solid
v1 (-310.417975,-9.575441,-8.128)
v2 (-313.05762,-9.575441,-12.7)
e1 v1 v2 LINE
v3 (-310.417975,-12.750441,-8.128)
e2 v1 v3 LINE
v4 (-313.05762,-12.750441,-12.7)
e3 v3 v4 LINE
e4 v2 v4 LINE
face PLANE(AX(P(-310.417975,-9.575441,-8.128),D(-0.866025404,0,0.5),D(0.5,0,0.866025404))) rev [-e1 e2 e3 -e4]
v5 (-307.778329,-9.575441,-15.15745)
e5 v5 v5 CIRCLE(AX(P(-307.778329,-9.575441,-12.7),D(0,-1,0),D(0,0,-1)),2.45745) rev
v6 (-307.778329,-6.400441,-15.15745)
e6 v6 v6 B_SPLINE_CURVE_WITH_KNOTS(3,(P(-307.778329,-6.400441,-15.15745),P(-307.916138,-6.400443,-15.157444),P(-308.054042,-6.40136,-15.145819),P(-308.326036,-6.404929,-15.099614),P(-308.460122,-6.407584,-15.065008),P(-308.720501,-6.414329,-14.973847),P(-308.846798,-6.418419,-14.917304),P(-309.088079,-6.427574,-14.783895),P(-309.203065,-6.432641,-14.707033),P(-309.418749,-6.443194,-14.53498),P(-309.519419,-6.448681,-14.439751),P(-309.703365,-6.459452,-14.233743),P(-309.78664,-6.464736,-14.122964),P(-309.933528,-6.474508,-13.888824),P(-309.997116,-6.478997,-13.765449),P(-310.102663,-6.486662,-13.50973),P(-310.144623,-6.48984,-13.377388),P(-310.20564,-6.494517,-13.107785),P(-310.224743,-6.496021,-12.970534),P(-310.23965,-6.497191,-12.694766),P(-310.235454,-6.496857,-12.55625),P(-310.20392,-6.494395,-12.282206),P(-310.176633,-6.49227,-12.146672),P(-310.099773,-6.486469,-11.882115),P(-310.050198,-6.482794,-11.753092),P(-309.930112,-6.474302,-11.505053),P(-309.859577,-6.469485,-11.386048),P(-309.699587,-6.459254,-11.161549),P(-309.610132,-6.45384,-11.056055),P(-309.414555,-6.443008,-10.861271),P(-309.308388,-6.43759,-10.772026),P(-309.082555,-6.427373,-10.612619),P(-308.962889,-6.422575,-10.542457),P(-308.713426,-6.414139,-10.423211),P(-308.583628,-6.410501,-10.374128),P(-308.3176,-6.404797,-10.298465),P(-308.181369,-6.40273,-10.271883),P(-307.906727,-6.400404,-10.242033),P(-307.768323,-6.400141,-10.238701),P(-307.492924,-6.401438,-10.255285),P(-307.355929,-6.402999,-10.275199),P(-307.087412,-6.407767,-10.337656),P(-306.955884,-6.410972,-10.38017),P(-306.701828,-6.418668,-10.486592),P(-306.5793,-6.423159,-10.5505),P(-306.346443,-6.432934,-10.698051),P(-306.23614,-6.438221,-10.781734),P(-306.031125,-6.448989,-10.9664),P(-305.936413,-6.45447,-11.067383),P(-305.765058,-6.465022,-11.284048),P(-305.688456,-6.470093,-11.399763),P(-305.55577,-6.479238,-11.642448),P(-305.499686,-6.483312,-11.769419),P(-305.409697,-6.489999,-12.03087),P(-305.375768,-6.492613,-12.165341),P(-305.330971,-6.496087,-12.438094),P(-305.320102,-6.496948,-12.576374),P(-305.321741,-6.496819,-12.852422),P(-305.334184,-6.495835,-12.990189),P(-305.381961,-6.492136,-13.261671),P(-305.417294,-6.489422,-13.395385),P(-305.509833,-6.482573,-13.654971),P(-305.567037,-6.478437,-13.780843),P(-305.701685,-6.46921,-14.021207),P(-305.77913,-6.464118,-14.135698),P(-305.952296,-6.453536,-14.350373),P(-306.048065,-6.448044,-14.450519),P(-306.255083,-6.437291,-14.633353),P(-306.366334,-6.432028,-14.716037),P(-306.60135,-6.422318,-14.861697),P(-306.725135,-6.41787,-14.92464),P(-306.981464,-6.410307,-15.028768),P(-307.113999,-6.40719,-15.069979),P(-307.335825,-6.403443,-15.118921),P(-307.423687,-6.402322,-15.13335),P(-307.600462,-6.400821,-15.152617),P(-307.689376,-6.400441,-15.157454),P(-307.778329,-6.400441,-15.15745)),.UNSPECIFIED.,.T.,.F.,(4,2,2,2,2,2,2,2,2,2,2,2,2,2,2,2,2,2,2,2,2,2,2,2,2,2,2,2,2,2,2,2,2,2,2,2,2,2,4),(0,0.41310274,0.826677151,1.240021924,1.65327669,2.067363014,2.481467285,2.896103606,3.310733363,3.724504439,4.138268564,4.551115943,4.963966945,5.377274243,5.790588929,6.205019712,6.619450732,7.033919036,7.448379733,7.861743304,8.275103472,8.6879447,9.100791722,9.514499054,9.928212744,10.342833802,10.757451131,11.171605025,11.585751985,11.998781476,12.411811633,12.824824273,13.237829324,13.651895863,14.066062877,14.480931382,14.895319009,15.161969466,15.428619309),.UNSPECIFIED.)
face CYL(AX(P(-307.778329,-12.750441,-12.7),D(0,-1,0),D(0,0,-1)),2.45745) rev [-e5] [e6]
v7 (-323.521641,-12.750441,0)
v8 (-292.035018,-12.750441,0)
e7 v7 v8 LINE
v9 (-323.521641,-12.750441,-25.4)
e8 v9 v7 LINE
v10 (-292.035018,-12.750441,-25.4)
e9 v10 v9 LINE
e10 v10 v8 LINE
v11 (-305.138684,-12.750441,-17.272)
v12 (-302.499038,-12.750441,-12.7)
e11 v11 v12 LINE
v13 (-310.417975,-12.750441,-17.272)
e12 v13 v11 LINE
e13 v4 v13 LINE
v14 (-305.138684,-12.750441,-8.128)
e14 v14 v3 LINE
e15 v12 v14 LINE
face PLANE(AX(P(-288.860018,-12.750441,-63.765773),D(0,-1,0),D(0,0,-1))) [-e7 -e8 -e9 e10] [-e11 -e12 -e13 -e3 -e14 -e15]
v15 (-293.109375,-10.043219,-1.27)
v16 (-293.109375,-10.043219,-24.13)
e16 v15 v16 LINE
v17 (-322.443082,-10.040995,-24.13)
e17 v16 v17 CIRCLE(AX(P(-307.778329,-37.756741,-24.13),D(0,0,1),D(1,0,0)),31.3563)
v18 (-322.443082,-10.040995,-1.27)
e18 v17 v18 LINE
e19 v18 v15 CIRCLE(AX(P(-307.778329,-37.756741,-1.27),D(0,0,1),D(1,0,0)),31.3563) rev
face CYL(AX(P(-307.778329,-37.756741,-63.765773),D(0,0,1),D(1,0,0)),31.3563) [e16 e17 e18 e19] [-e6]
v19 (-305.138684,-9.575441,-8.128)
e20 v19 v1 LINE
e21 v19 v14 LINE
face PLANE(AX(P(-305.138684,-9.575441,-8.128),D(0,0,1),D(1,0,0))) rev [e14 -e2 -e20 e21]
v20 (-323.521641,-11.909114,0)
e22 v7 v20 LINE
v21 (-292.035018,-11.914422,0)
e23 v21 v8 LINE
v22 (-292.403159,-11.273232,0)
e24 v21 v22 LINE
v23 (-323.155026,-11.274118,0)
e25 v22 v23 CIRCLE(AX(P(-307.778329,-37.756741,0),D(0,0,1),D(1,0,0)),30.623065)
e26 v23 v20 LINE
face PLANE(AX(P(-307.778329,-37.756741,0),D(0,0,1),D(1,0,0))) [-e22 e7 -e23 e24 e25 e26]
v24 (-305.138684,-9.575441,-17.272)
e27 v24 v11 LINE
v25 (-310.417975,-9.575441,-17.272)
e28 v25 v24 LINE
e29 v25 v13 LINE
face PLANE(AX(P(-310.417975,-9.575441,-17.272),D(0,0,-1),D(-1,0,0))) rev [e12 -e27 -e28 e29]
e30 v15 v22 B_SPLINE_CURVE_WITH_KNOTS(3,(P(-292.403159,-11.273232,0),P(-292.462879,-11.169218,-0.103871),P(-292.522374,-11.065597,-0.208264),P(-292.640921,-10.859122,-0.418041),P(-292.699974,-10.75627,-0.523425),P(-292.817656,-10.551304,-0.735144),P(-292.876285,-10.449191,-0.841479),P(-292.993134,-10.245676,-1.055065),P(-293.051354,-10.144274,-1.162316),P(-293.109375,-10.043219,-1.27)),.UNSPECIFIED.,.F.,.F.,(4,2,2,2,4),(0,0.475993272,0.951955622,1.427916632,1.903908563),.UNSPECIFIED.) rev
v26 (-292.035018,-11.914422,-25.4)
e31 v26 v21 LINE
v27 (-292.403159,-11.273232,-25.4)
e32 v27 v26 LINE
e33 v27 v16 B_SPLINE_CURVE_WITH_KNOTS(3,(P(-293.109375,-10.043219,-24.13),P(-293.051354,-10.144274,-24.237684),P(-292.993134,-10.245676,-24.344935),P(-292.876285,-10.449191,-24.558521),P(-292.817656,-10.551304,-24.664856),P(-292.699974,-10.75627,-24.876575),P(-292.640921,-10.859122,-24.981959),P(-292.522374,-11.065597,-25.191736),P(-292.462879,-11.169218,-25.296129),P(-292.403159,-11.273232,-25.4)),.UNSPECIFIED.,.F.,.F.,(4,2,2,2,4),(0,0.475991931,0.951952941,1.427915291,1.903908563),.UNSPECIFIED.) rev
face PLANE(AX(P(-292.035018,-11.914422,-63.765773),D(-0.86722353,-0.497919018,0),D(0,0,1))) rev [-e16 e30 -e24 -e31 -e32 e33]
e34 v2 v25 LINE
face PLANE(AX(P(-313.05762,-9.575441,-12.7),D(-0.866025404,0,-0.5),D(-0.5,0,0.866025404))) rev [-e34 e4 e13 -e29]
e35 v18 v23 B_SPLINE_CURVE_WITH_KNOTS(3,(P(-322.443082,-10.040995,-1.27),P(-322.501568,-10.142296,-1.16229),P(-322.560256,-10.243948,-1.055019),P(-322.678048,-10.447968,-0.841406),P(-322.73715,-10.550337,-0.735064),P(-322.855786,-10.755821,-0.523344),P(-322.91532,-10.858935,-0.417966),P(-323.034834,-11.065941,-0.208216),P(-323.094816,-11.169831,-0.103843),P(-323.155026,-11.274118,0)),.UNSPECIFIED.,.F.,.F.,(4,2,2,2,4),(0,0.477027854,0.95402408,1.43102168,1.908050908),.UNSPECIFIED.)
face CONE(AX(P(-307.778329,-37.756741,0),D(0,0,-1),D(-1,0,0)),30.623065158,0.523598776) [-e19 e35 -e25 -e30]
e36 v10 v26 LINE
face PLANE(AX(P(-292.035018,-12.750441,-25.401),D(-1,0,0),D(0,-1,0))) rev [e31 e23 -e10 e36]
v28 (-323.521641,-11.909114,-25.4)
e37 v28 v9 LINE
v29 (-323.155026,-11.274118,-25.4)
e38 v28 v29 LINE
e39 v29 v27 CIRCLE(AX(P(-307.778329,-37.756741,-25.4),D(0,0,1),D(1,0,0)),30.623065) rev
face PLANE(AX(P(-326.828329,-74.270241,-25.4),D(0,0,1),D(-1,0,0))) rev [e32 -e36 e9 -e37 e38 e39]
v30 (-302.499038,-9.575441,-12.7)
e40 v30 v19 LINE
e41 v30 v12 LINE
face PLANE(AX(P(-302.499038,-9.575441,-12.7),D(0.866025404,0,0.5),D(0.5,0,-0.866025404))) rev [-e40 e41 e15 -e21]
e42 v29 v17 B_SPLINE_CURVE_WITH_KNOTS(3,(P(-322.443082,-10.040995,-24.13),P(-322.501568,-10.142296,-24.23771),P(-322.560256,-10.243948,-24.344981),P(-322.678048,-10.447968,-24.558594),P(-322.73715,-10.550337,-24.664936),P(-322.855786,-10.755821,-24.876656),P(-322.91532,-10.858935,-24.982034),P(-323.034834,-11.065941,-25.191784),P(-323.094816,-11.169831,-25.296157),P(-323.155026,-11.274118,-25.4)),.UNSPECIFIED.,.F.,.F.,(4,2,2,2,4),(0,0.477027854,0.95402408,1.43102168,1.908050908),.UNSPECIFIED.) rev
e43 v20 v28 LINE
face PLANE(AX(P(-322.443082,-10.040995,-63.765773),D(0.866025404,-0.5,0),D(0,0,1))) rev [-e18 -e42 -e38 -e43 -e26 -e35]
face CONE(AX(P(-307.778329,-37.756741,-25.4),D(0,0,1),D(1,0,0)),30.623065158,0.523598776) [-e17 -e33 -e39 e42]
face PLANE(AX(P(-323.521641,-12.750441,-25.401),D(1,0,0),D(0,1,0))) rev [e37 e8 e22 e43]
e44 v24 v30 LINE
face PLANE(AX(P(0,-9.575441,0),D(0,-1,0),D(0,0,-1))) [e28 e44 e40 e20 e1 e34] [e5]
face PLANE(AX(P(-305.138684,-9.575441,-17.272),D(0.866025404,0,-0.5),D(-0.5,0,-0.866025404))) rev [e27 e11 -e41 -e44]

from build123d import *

# Parameters (mm, degrees)
BOSS_EXTRUDE1_DEPTH   = 25.4
CUT_EXTRUDE1_REACH    = 329.931
F_8_CLEARANCE_HOLE1_D = 4.9149
CHAMFER1_SIZE         = 1.275307785
CHAMFER1_SIZE_2       = 1.27
CHAMFER1_SIZE_3       = 0.733234842
CUT_EXTRUDE2_DEPTH    = 3.175


with BuildPart() as part:
    # Sketch1 → Boss-Extrude1 (new body)
    with BuildSketch(Plane.XY):
        with BuildLine():
            Line((-288.860017795, -12.750441382), (-326.696640794, -12.750441382))
            ThreePointArc((-326.696640794, -12.750441382), (-307.778329294, -6.400441382), (-288.860017795, -12.750441382))
        make_face()
    extrude(amount=-BOSS_EXTRUDE1_DEPTH)

    # Sketch2 → Cut-Extrude1 (cut, up to next)
    with BuildSketch(Plane.XY, mode=Mode.PRIVATE) as cut_extrude1_sk1:
        with BuildLine():
            Line((-292.035017795, -12.750441382), (-292.035017795, -10.639114407))
            ThreePointArc((-292.035017795, -10.639114407), (-290.415395998, -11.646473343), (-288.860017795, -12.750441382))
            Line((-288.860017795, -12.750441382), (-292.035017795, -12.750441382))
        make_face()
    cut_extrude1_tool1 = extrude(cut_extrude1_sk1.sketch, amount=-CUT_EXTRUDE1_REACH, mode=Mode.PRIVATE) & part.part
    # Sketch2 → Cut-Extrude1 (cut, up to next)
    with BuildSketch(Plane.XY, mode=Mode.PRIVATE) as cut_extrude1_sk2:
        with BuildLine():
            Line((-323.521640794, -12.750441382), (-326.696640794, -12.750441382))
            ThreePointArc((-326.696640794, -12.750441382), (-325.14126259, -11.646473343), (-323.521640794, -10.639114407))
            Line((-323.521640794, -10.639114407), (-323.521640794, -12.750441382))
        make_face()
    cut_extrude1_tool2 = extrude(cut_extrude1_sk2.sketch, amount=-CUT_EXTRUDE1_REACH, mode=Mode.PRIVATE) & part.part
    add(cut_extrude1_tool1.solids().sort_by_distance((-290.95384, -12.03102, 0))[0], mode=Mode.SUBTRACT)
    add(cut_extrude1_tool2.solids().sort_by_distance((-324.602819, -12.03102, 0))[0], mode=Mode.SUBTRACT)

    # #8 Clearance Hole1 (through all)
    with Locations(Plane(origin=(0, -12.750441382, 0), x_dir=(-1, 0, 0), z_dir=(0, -1, 0))):
        with Locations((307.778329294, 12.7)):
            Hole(F_8_CLEARANCE_HOLE1_D / 2)

    # Chamfer1
    # the kernel refuses this chamfer: 1.275307785, 1.27, 0.733234842 mm, written as the material it takes off along each edge
    with BuildSketch(Plane(origin=(-292.035017795, -10.639114407, 3.299478256), x_dir=(-0.8744921081912179, 0.4850397434347821, 0), z_dir=(0, 0, -1))) as chamfer1_piece_1:
        with BuildLine():
            Line((1.228549666, 0), (-CHAMFER1_SIZE * 0.485039743592, -CHAMFER1_SIZE * 0.874492108474))
            Line((-CHAMFER1_SIZE * 0.485039743592, -CHAMFER1_SIZE * 0.874492108474), (0, 0))
            ThreePointArc((0, 0), (0.636104744, 0.006009849), (1.228549666, 0))
        make_face()
    extrude(amount=31.998956511, mode=Mode.SUBTRACT)
    with BuildSketch(Plane(origin=(-323.521640794, -10.639114407, 3.286063629), x_dir=(0.8745288770995413, 0.4849734457875147, 0), z_dir=(0, 0, -1))) as chamfer1_piece_2:
        with BuildLine():
            Line((1.233303065, 0), (-CHAMFER1_SIZE_2 * 0.484973445787, CHAMFER1_SIZE_2 * 0.8745288771))
            Line((-CHAMFER1_SIZE_2 * 0.484973445787, CHAMFER1_SIZE_2 * 0.8745288771), (0, 0))
            ThreePointArc((0, 0), (0.638512102, -0.006056486), (1.233303065, 0))
        make_face()
    extrude(amount=31.972127259, mode=Mode.SUBTRACT)
    # the kernel refuses this chamfer: 1.275307785, 1.27, 0.733234842 mm, written as the material it takes off along each edge
    with BuildSketch(Plane(origin=(-307.778329294, -37.756741382, -25.4), x_dir=(-0.5575773235938082, 0.8301250075825723, 0), z_dir=(-0.8301250075825723, -0.5575773235938082, 0))) as chamfer1_2_piece_1:
        Polygon((31.3563, -CHAMFER1_SIZE_2), (31.3563 - CHAMFER1_SIZE_3, 0), (31.3563, 0), align=None)
    revolve(axis=Axis((-307.778329294, -37.756741382, -25.4), (0, 0, -1)), revolution_arc=67.785524428, mode=Mode.SUBTRACT)
    with BuildSketch(Plane(origin=(-307.778329294, -37.756741382, 0), x_dir=(-0.5575773235938082, 0.8301250075825723, 0), z_dir=(-0.8301250075825723, -0.5575773235938082, 0))) as chamfer1_2_piece_2:
        Polygon((31.3563, CHAMFER1_SIZE_2), (31.3563 - CHAMFER1_SIZE_3, 0), (31.3563, 0), align=None)
    revolve(axis=Axis((-307.778329294, -37.756741382, 0), (0, 0, -1)), revolution_arc=67.785524428, mode=Mode.SUBTRACT)

    # Sketch5 → Cut-Extrude2 (cut)
    with BuildSketch(Plane.XZ.offset(12.750441382)):
        Polygon((-310.417974725, -17.272), (-305.138683864, -17.272), (-302.499038433, -12.7), (-305.138683864, -8.128), (-310.417974725, -8.128), (-313.057620156, -12.7), align=None)
    extrude(amount=-CUT_EXTRUDE2_DEPTH, mode=Mode.SUBTRACT)


solid = part.part
